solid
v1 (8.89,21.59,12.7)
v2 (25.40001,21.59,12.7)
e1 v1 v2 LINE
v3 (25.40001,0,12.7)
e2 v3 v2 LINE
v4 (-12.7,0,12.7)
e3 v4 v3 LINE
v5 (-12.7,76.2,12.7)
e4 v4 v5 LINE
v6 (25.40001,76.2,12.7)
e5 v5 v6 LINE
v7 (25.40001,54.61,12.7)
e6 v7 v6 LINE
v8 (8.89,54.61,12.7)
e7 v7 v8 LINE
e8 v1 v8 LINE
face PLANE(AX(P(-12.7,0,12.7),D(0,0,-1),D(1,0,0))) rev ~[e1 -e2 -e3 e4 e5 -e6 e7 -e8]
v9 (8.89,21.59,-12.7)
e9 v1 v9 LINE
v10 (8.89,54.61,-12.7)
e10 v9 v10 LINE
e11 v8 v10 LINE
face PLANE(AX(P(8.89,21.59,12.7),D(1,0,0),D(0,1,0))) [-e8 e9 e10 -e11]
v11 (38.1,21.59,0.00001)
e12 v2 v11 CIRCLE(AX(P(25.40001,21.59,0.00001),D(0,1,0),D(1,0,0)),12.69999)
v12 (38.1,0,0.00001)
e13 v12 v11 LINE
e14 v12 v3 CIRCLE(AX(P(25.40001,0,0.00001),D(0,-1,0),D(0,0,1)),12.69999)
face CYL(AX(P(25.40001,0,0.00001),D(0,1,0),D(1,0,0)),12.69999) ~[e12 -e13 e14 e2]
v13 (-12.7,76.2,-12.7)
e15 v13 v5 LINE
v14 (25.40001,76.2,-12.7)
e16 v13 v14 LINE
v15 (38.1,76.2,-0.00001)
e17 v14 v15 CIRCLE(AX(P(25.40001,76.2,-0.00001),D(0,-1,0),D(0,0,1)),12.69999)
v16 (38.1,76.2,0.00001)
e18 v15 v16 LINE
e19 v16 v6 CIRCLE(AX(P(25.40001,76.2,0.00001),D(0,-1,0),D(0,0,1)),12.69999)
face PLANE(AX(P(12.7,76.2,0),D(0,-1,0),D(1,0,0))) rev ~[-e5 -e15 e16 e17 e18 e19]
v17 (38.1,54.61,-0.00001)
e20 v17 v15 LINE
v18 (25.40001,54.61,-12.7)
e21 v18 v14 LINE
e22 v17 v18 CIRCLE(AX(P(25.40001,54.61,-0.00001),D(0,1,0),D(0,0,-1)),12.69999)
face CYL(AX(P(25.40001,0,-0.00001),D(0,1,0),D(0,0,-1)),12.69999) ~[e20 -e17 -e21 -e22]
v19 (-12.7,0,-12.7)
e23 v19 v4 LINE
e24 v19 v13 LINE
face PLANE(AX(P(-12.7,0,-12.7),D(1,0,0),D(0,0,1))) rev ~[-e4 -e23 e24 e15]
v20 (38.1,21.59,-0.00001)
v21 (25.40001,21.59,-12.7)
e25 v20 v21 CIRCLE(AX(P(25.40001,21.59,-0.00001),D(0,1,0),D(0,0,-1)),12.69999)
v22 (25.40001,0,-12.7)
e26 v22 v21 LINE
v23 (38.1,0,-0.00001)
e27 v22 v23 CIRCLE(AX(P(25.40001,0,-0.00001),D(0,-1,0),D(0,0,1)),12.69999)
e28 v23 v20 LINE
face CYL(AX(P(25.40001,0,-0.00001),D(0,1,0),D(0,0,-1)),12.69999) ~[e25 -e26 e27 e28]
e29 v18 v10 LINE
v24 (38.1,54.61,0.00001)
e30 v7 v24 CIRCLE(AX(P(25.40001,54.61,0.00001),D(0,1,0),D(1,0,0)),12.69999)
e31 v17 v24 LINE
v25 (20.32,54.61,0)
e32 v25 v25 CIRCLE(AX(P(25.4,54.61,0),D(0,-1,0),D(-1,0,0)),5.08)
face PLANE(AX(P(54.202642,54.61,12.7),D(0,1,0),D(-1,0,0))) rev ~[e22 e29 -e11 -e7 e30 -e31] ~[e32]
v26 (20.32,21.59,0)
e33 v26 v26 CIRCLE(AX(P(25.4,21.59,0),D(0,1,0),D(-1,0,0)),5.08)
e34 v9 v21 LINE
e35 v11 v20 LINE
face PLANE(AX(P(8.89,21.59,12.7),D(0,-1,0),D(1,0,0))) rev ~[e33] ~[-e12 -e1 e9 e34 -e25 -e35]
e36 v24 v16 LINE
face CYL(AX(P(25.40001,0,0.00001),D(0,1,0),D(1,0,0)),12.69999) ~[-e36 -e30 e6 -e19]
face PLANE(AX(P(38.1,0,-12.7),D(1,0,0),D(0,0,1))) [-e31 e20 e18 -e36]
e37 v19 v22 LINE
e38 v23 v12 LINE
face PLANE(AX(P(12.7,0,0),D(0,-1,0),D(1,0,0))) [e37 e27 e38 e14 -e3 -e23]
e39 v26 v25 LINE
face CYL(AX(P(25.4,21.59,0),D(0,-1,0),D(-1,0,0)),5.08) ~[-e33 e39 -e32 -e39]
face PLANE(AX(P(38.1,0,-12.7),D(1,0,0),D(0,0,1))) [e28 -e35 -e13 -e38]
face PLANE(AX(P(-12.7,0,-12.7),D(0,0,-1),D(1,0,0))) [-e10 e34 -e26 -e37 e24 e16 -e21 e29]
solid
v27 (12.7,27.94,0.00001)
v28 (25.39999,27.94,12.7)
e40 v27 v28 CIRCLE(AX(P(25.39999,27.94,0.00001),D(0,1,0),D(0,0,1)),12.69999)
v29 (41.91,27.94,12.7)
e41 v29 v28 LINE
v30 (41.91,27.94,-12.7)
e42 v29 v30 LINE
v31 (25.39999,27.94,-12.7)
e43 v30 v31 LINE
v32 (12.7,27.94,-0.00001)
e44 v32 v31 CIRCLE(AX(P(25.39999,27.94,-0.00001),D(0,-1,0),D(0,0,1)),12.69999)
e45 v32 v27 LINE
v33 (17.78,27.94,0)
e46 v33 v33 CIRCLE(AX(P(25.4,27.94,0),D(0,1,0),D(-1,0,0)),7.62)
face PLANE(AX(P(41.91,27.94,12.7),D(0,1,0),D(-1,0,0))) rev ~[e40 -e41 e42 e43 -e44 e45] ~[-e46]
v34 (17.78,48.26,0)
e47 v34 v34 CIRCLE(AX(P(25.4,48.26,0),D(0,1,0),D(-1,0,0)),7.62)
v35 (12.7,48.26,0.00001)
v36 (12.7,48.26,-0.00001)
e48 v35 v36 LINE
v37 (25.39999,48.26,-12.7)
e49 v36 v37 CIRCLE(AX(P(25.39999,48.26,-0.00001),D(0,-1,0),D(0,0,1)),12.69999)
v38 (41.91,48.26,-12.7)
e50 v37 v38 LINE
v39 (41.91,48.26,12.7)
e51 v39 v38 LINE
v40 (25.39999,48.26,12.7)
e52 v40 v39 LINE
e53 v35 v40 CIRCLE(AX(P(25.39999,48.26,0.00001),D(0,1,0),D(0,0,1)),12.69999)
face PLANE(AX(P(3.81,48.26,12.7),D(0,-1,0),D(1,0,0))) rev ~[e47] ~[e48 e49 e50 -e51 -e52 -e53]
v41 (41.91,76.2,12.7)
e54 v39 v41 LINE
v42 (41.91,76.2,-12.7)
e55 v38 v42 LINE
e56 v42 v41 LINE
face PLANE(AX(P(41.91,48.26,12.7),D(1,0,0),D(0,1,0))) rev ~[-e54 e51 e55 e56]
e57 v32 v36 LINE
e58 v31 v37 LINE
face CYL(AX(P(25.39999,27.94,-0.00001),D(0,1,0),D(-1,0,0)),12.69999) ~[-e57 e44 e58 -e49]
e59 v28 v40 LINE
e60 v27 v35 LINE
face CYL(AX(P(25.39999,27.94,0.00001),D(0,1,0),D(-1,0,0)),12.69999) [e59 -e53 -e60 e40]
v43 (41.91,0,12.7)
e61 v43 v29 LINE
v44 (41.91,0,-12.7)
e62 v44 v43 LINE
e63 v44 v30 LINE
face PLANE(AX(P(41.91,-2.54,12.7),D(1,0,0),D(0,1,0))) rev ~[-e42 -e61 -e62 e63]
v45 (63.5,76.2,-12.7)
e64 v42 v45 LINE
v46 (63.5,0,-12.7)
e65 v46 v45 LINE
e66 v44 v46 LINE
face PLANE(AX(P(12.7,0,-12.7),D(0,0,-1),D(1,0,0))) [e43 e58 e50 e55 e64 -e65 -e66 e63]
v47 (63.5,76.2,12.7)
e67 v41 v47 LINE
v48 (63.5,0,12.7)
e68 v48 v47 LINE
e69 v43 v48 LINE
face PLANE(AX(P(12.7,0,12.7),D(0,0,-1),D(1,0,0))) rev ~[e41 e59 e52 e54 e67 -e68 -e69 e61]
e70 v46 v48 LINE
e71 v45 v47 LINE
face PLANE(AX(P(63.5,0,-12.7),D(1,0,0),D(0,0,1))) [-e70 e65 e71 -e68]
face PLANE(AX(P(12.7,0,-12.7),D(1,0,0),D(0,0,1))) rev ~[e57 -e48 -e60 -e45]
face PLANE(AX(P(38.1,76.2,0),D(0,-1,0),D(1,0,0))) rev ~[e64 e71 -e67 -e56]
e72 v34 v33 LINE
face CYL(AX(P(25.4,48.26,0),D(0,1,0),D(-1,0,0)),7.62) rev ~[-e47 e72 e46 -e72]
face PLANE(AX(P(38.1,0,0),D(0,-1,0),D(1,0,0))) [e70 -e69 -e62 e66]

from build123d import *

# Parameters (mm, degrees)
F0_W      = 50.8
F0_H      = 25.4
F1_DEPTH  = 76.2
F2_R      = 12.69999
F3_W      = 28.8026324581
F3_H      = 33.02
F3_W_2    = 16.51001
F4_DEPTH  = 25.4
F5_R      = 5.08
F6_DEPTH  = 34.2138
F7_W      = 50.8
F7_H      = 25.4
F8_DEPTH  = 76.2
F9_W      = 29.21
F9_H      = 27.94
F10_DEPTH = 25.4
F11_R     = 12.69999
F12_R     = 7.62
F13_DEPTH = 25.4


# Not quite as in the source:
# - a fillet or chamfer is up to 0.001 mm smaller than in the source, because OpenCascade refuses the exact size


with BuildPart() as f1:
    # F0 (on Front) → F1 (new body)
    with BuildSketch(Plane.XZ):
        with Locations((12.7, 0)):
            Rectangle(F0_W, F0_H)
    extrude(amount=-F1_DEPTH)

    # F2 (radius 12.7 in the source; OpenCascade refuses exactly that, so slightly less here)
    f2_edges = [f1.edges().sort_by_distance(p)[0] for p in [
        (38.1, 38.1, 12.7),
        (38.1, 38.1, -12.7),
    ]]
    fillet(f2_edges, radius=F2_R)

    # F3 (on face) → F4 (cut)
    with BuildSketch(Plane.XY.offset(12.7)):
        with Locations((39.8013262291, 38.1)):
            Rectangle(F3_W, F3_H)
        with Locations((17.145005, 38.1)):
            Rectangle(F3_W_2, F3_H)
    extrude(amount=-F4_DEPTH, mode=Mode.SUBTRACT)

    # F5 (on face) → F6 (join)
    with BuildSketch(Plane(origin=(0, 21.59, 0), x_dir=(-1, 0, 0), z_dir=(0, 1, 0))):
        with Locations((-25.4, 0)):
            Circle(F5_R)
    extrude(amount=F6_DEPTH)


with BuildPart() as f8:
    # F7 (on Front) → F8 (new body)
    with BuildSketch(Plane.XZ):
        with Locations((38.1, 0)):
            Rectangle(F7_W, F7_H)
    extrude(amount=-F8_DEPTH)

    # F9 (on face) → F10 (cut)
    with BuildSketch(Plane.XY.offset(12.7)):
        with Locations((27.305, 62.23)):
            Rectangle(F9_W, F9_H)
        Polygon((41.91, 76.2), (41.91, 78.74), (-8.89, 78.74), (-8.89, -2.54), (41.91, -2.54), (41.91, 0), (12.7, 0), (12.7, 27.94), (3.81, 27.94), (3.81, 48.26), (12.7, 48.26), (12.7, 76.2), align=None)
        with Locations((27.305, 13.97)):
            Rectangle(F9_W, F9_H)
    extrude(amount=-F10_DEPTH, mode=Mode.SUBTRACT)

    # F11 (radius 12.7 in the source; OpenCascade refuses exactly that, so slightly less here)
    f11_edges = [f8.edges().sort_by_distance(p)[0] for p in [
        (12.7, 38.1, 12.7),
        (12.7, 38.1, -12.7),
    ]]
    fillet(f11_edges, radius=F11_R)

    # F12 (on face) → F13 (cut)
    with BuildSketch(Plane(origin=(0, 48.26, 0), x_dir=(-1, 0, 0), z_dir=(0, 1, 0))):
        with Locations((-25.4, 0)):
            Circle(F12_R)
    extrude(amount=-F13_DEPTH, mode=Mode.SUBTRACT)


solid = Compound([f1.part, f8.part])
